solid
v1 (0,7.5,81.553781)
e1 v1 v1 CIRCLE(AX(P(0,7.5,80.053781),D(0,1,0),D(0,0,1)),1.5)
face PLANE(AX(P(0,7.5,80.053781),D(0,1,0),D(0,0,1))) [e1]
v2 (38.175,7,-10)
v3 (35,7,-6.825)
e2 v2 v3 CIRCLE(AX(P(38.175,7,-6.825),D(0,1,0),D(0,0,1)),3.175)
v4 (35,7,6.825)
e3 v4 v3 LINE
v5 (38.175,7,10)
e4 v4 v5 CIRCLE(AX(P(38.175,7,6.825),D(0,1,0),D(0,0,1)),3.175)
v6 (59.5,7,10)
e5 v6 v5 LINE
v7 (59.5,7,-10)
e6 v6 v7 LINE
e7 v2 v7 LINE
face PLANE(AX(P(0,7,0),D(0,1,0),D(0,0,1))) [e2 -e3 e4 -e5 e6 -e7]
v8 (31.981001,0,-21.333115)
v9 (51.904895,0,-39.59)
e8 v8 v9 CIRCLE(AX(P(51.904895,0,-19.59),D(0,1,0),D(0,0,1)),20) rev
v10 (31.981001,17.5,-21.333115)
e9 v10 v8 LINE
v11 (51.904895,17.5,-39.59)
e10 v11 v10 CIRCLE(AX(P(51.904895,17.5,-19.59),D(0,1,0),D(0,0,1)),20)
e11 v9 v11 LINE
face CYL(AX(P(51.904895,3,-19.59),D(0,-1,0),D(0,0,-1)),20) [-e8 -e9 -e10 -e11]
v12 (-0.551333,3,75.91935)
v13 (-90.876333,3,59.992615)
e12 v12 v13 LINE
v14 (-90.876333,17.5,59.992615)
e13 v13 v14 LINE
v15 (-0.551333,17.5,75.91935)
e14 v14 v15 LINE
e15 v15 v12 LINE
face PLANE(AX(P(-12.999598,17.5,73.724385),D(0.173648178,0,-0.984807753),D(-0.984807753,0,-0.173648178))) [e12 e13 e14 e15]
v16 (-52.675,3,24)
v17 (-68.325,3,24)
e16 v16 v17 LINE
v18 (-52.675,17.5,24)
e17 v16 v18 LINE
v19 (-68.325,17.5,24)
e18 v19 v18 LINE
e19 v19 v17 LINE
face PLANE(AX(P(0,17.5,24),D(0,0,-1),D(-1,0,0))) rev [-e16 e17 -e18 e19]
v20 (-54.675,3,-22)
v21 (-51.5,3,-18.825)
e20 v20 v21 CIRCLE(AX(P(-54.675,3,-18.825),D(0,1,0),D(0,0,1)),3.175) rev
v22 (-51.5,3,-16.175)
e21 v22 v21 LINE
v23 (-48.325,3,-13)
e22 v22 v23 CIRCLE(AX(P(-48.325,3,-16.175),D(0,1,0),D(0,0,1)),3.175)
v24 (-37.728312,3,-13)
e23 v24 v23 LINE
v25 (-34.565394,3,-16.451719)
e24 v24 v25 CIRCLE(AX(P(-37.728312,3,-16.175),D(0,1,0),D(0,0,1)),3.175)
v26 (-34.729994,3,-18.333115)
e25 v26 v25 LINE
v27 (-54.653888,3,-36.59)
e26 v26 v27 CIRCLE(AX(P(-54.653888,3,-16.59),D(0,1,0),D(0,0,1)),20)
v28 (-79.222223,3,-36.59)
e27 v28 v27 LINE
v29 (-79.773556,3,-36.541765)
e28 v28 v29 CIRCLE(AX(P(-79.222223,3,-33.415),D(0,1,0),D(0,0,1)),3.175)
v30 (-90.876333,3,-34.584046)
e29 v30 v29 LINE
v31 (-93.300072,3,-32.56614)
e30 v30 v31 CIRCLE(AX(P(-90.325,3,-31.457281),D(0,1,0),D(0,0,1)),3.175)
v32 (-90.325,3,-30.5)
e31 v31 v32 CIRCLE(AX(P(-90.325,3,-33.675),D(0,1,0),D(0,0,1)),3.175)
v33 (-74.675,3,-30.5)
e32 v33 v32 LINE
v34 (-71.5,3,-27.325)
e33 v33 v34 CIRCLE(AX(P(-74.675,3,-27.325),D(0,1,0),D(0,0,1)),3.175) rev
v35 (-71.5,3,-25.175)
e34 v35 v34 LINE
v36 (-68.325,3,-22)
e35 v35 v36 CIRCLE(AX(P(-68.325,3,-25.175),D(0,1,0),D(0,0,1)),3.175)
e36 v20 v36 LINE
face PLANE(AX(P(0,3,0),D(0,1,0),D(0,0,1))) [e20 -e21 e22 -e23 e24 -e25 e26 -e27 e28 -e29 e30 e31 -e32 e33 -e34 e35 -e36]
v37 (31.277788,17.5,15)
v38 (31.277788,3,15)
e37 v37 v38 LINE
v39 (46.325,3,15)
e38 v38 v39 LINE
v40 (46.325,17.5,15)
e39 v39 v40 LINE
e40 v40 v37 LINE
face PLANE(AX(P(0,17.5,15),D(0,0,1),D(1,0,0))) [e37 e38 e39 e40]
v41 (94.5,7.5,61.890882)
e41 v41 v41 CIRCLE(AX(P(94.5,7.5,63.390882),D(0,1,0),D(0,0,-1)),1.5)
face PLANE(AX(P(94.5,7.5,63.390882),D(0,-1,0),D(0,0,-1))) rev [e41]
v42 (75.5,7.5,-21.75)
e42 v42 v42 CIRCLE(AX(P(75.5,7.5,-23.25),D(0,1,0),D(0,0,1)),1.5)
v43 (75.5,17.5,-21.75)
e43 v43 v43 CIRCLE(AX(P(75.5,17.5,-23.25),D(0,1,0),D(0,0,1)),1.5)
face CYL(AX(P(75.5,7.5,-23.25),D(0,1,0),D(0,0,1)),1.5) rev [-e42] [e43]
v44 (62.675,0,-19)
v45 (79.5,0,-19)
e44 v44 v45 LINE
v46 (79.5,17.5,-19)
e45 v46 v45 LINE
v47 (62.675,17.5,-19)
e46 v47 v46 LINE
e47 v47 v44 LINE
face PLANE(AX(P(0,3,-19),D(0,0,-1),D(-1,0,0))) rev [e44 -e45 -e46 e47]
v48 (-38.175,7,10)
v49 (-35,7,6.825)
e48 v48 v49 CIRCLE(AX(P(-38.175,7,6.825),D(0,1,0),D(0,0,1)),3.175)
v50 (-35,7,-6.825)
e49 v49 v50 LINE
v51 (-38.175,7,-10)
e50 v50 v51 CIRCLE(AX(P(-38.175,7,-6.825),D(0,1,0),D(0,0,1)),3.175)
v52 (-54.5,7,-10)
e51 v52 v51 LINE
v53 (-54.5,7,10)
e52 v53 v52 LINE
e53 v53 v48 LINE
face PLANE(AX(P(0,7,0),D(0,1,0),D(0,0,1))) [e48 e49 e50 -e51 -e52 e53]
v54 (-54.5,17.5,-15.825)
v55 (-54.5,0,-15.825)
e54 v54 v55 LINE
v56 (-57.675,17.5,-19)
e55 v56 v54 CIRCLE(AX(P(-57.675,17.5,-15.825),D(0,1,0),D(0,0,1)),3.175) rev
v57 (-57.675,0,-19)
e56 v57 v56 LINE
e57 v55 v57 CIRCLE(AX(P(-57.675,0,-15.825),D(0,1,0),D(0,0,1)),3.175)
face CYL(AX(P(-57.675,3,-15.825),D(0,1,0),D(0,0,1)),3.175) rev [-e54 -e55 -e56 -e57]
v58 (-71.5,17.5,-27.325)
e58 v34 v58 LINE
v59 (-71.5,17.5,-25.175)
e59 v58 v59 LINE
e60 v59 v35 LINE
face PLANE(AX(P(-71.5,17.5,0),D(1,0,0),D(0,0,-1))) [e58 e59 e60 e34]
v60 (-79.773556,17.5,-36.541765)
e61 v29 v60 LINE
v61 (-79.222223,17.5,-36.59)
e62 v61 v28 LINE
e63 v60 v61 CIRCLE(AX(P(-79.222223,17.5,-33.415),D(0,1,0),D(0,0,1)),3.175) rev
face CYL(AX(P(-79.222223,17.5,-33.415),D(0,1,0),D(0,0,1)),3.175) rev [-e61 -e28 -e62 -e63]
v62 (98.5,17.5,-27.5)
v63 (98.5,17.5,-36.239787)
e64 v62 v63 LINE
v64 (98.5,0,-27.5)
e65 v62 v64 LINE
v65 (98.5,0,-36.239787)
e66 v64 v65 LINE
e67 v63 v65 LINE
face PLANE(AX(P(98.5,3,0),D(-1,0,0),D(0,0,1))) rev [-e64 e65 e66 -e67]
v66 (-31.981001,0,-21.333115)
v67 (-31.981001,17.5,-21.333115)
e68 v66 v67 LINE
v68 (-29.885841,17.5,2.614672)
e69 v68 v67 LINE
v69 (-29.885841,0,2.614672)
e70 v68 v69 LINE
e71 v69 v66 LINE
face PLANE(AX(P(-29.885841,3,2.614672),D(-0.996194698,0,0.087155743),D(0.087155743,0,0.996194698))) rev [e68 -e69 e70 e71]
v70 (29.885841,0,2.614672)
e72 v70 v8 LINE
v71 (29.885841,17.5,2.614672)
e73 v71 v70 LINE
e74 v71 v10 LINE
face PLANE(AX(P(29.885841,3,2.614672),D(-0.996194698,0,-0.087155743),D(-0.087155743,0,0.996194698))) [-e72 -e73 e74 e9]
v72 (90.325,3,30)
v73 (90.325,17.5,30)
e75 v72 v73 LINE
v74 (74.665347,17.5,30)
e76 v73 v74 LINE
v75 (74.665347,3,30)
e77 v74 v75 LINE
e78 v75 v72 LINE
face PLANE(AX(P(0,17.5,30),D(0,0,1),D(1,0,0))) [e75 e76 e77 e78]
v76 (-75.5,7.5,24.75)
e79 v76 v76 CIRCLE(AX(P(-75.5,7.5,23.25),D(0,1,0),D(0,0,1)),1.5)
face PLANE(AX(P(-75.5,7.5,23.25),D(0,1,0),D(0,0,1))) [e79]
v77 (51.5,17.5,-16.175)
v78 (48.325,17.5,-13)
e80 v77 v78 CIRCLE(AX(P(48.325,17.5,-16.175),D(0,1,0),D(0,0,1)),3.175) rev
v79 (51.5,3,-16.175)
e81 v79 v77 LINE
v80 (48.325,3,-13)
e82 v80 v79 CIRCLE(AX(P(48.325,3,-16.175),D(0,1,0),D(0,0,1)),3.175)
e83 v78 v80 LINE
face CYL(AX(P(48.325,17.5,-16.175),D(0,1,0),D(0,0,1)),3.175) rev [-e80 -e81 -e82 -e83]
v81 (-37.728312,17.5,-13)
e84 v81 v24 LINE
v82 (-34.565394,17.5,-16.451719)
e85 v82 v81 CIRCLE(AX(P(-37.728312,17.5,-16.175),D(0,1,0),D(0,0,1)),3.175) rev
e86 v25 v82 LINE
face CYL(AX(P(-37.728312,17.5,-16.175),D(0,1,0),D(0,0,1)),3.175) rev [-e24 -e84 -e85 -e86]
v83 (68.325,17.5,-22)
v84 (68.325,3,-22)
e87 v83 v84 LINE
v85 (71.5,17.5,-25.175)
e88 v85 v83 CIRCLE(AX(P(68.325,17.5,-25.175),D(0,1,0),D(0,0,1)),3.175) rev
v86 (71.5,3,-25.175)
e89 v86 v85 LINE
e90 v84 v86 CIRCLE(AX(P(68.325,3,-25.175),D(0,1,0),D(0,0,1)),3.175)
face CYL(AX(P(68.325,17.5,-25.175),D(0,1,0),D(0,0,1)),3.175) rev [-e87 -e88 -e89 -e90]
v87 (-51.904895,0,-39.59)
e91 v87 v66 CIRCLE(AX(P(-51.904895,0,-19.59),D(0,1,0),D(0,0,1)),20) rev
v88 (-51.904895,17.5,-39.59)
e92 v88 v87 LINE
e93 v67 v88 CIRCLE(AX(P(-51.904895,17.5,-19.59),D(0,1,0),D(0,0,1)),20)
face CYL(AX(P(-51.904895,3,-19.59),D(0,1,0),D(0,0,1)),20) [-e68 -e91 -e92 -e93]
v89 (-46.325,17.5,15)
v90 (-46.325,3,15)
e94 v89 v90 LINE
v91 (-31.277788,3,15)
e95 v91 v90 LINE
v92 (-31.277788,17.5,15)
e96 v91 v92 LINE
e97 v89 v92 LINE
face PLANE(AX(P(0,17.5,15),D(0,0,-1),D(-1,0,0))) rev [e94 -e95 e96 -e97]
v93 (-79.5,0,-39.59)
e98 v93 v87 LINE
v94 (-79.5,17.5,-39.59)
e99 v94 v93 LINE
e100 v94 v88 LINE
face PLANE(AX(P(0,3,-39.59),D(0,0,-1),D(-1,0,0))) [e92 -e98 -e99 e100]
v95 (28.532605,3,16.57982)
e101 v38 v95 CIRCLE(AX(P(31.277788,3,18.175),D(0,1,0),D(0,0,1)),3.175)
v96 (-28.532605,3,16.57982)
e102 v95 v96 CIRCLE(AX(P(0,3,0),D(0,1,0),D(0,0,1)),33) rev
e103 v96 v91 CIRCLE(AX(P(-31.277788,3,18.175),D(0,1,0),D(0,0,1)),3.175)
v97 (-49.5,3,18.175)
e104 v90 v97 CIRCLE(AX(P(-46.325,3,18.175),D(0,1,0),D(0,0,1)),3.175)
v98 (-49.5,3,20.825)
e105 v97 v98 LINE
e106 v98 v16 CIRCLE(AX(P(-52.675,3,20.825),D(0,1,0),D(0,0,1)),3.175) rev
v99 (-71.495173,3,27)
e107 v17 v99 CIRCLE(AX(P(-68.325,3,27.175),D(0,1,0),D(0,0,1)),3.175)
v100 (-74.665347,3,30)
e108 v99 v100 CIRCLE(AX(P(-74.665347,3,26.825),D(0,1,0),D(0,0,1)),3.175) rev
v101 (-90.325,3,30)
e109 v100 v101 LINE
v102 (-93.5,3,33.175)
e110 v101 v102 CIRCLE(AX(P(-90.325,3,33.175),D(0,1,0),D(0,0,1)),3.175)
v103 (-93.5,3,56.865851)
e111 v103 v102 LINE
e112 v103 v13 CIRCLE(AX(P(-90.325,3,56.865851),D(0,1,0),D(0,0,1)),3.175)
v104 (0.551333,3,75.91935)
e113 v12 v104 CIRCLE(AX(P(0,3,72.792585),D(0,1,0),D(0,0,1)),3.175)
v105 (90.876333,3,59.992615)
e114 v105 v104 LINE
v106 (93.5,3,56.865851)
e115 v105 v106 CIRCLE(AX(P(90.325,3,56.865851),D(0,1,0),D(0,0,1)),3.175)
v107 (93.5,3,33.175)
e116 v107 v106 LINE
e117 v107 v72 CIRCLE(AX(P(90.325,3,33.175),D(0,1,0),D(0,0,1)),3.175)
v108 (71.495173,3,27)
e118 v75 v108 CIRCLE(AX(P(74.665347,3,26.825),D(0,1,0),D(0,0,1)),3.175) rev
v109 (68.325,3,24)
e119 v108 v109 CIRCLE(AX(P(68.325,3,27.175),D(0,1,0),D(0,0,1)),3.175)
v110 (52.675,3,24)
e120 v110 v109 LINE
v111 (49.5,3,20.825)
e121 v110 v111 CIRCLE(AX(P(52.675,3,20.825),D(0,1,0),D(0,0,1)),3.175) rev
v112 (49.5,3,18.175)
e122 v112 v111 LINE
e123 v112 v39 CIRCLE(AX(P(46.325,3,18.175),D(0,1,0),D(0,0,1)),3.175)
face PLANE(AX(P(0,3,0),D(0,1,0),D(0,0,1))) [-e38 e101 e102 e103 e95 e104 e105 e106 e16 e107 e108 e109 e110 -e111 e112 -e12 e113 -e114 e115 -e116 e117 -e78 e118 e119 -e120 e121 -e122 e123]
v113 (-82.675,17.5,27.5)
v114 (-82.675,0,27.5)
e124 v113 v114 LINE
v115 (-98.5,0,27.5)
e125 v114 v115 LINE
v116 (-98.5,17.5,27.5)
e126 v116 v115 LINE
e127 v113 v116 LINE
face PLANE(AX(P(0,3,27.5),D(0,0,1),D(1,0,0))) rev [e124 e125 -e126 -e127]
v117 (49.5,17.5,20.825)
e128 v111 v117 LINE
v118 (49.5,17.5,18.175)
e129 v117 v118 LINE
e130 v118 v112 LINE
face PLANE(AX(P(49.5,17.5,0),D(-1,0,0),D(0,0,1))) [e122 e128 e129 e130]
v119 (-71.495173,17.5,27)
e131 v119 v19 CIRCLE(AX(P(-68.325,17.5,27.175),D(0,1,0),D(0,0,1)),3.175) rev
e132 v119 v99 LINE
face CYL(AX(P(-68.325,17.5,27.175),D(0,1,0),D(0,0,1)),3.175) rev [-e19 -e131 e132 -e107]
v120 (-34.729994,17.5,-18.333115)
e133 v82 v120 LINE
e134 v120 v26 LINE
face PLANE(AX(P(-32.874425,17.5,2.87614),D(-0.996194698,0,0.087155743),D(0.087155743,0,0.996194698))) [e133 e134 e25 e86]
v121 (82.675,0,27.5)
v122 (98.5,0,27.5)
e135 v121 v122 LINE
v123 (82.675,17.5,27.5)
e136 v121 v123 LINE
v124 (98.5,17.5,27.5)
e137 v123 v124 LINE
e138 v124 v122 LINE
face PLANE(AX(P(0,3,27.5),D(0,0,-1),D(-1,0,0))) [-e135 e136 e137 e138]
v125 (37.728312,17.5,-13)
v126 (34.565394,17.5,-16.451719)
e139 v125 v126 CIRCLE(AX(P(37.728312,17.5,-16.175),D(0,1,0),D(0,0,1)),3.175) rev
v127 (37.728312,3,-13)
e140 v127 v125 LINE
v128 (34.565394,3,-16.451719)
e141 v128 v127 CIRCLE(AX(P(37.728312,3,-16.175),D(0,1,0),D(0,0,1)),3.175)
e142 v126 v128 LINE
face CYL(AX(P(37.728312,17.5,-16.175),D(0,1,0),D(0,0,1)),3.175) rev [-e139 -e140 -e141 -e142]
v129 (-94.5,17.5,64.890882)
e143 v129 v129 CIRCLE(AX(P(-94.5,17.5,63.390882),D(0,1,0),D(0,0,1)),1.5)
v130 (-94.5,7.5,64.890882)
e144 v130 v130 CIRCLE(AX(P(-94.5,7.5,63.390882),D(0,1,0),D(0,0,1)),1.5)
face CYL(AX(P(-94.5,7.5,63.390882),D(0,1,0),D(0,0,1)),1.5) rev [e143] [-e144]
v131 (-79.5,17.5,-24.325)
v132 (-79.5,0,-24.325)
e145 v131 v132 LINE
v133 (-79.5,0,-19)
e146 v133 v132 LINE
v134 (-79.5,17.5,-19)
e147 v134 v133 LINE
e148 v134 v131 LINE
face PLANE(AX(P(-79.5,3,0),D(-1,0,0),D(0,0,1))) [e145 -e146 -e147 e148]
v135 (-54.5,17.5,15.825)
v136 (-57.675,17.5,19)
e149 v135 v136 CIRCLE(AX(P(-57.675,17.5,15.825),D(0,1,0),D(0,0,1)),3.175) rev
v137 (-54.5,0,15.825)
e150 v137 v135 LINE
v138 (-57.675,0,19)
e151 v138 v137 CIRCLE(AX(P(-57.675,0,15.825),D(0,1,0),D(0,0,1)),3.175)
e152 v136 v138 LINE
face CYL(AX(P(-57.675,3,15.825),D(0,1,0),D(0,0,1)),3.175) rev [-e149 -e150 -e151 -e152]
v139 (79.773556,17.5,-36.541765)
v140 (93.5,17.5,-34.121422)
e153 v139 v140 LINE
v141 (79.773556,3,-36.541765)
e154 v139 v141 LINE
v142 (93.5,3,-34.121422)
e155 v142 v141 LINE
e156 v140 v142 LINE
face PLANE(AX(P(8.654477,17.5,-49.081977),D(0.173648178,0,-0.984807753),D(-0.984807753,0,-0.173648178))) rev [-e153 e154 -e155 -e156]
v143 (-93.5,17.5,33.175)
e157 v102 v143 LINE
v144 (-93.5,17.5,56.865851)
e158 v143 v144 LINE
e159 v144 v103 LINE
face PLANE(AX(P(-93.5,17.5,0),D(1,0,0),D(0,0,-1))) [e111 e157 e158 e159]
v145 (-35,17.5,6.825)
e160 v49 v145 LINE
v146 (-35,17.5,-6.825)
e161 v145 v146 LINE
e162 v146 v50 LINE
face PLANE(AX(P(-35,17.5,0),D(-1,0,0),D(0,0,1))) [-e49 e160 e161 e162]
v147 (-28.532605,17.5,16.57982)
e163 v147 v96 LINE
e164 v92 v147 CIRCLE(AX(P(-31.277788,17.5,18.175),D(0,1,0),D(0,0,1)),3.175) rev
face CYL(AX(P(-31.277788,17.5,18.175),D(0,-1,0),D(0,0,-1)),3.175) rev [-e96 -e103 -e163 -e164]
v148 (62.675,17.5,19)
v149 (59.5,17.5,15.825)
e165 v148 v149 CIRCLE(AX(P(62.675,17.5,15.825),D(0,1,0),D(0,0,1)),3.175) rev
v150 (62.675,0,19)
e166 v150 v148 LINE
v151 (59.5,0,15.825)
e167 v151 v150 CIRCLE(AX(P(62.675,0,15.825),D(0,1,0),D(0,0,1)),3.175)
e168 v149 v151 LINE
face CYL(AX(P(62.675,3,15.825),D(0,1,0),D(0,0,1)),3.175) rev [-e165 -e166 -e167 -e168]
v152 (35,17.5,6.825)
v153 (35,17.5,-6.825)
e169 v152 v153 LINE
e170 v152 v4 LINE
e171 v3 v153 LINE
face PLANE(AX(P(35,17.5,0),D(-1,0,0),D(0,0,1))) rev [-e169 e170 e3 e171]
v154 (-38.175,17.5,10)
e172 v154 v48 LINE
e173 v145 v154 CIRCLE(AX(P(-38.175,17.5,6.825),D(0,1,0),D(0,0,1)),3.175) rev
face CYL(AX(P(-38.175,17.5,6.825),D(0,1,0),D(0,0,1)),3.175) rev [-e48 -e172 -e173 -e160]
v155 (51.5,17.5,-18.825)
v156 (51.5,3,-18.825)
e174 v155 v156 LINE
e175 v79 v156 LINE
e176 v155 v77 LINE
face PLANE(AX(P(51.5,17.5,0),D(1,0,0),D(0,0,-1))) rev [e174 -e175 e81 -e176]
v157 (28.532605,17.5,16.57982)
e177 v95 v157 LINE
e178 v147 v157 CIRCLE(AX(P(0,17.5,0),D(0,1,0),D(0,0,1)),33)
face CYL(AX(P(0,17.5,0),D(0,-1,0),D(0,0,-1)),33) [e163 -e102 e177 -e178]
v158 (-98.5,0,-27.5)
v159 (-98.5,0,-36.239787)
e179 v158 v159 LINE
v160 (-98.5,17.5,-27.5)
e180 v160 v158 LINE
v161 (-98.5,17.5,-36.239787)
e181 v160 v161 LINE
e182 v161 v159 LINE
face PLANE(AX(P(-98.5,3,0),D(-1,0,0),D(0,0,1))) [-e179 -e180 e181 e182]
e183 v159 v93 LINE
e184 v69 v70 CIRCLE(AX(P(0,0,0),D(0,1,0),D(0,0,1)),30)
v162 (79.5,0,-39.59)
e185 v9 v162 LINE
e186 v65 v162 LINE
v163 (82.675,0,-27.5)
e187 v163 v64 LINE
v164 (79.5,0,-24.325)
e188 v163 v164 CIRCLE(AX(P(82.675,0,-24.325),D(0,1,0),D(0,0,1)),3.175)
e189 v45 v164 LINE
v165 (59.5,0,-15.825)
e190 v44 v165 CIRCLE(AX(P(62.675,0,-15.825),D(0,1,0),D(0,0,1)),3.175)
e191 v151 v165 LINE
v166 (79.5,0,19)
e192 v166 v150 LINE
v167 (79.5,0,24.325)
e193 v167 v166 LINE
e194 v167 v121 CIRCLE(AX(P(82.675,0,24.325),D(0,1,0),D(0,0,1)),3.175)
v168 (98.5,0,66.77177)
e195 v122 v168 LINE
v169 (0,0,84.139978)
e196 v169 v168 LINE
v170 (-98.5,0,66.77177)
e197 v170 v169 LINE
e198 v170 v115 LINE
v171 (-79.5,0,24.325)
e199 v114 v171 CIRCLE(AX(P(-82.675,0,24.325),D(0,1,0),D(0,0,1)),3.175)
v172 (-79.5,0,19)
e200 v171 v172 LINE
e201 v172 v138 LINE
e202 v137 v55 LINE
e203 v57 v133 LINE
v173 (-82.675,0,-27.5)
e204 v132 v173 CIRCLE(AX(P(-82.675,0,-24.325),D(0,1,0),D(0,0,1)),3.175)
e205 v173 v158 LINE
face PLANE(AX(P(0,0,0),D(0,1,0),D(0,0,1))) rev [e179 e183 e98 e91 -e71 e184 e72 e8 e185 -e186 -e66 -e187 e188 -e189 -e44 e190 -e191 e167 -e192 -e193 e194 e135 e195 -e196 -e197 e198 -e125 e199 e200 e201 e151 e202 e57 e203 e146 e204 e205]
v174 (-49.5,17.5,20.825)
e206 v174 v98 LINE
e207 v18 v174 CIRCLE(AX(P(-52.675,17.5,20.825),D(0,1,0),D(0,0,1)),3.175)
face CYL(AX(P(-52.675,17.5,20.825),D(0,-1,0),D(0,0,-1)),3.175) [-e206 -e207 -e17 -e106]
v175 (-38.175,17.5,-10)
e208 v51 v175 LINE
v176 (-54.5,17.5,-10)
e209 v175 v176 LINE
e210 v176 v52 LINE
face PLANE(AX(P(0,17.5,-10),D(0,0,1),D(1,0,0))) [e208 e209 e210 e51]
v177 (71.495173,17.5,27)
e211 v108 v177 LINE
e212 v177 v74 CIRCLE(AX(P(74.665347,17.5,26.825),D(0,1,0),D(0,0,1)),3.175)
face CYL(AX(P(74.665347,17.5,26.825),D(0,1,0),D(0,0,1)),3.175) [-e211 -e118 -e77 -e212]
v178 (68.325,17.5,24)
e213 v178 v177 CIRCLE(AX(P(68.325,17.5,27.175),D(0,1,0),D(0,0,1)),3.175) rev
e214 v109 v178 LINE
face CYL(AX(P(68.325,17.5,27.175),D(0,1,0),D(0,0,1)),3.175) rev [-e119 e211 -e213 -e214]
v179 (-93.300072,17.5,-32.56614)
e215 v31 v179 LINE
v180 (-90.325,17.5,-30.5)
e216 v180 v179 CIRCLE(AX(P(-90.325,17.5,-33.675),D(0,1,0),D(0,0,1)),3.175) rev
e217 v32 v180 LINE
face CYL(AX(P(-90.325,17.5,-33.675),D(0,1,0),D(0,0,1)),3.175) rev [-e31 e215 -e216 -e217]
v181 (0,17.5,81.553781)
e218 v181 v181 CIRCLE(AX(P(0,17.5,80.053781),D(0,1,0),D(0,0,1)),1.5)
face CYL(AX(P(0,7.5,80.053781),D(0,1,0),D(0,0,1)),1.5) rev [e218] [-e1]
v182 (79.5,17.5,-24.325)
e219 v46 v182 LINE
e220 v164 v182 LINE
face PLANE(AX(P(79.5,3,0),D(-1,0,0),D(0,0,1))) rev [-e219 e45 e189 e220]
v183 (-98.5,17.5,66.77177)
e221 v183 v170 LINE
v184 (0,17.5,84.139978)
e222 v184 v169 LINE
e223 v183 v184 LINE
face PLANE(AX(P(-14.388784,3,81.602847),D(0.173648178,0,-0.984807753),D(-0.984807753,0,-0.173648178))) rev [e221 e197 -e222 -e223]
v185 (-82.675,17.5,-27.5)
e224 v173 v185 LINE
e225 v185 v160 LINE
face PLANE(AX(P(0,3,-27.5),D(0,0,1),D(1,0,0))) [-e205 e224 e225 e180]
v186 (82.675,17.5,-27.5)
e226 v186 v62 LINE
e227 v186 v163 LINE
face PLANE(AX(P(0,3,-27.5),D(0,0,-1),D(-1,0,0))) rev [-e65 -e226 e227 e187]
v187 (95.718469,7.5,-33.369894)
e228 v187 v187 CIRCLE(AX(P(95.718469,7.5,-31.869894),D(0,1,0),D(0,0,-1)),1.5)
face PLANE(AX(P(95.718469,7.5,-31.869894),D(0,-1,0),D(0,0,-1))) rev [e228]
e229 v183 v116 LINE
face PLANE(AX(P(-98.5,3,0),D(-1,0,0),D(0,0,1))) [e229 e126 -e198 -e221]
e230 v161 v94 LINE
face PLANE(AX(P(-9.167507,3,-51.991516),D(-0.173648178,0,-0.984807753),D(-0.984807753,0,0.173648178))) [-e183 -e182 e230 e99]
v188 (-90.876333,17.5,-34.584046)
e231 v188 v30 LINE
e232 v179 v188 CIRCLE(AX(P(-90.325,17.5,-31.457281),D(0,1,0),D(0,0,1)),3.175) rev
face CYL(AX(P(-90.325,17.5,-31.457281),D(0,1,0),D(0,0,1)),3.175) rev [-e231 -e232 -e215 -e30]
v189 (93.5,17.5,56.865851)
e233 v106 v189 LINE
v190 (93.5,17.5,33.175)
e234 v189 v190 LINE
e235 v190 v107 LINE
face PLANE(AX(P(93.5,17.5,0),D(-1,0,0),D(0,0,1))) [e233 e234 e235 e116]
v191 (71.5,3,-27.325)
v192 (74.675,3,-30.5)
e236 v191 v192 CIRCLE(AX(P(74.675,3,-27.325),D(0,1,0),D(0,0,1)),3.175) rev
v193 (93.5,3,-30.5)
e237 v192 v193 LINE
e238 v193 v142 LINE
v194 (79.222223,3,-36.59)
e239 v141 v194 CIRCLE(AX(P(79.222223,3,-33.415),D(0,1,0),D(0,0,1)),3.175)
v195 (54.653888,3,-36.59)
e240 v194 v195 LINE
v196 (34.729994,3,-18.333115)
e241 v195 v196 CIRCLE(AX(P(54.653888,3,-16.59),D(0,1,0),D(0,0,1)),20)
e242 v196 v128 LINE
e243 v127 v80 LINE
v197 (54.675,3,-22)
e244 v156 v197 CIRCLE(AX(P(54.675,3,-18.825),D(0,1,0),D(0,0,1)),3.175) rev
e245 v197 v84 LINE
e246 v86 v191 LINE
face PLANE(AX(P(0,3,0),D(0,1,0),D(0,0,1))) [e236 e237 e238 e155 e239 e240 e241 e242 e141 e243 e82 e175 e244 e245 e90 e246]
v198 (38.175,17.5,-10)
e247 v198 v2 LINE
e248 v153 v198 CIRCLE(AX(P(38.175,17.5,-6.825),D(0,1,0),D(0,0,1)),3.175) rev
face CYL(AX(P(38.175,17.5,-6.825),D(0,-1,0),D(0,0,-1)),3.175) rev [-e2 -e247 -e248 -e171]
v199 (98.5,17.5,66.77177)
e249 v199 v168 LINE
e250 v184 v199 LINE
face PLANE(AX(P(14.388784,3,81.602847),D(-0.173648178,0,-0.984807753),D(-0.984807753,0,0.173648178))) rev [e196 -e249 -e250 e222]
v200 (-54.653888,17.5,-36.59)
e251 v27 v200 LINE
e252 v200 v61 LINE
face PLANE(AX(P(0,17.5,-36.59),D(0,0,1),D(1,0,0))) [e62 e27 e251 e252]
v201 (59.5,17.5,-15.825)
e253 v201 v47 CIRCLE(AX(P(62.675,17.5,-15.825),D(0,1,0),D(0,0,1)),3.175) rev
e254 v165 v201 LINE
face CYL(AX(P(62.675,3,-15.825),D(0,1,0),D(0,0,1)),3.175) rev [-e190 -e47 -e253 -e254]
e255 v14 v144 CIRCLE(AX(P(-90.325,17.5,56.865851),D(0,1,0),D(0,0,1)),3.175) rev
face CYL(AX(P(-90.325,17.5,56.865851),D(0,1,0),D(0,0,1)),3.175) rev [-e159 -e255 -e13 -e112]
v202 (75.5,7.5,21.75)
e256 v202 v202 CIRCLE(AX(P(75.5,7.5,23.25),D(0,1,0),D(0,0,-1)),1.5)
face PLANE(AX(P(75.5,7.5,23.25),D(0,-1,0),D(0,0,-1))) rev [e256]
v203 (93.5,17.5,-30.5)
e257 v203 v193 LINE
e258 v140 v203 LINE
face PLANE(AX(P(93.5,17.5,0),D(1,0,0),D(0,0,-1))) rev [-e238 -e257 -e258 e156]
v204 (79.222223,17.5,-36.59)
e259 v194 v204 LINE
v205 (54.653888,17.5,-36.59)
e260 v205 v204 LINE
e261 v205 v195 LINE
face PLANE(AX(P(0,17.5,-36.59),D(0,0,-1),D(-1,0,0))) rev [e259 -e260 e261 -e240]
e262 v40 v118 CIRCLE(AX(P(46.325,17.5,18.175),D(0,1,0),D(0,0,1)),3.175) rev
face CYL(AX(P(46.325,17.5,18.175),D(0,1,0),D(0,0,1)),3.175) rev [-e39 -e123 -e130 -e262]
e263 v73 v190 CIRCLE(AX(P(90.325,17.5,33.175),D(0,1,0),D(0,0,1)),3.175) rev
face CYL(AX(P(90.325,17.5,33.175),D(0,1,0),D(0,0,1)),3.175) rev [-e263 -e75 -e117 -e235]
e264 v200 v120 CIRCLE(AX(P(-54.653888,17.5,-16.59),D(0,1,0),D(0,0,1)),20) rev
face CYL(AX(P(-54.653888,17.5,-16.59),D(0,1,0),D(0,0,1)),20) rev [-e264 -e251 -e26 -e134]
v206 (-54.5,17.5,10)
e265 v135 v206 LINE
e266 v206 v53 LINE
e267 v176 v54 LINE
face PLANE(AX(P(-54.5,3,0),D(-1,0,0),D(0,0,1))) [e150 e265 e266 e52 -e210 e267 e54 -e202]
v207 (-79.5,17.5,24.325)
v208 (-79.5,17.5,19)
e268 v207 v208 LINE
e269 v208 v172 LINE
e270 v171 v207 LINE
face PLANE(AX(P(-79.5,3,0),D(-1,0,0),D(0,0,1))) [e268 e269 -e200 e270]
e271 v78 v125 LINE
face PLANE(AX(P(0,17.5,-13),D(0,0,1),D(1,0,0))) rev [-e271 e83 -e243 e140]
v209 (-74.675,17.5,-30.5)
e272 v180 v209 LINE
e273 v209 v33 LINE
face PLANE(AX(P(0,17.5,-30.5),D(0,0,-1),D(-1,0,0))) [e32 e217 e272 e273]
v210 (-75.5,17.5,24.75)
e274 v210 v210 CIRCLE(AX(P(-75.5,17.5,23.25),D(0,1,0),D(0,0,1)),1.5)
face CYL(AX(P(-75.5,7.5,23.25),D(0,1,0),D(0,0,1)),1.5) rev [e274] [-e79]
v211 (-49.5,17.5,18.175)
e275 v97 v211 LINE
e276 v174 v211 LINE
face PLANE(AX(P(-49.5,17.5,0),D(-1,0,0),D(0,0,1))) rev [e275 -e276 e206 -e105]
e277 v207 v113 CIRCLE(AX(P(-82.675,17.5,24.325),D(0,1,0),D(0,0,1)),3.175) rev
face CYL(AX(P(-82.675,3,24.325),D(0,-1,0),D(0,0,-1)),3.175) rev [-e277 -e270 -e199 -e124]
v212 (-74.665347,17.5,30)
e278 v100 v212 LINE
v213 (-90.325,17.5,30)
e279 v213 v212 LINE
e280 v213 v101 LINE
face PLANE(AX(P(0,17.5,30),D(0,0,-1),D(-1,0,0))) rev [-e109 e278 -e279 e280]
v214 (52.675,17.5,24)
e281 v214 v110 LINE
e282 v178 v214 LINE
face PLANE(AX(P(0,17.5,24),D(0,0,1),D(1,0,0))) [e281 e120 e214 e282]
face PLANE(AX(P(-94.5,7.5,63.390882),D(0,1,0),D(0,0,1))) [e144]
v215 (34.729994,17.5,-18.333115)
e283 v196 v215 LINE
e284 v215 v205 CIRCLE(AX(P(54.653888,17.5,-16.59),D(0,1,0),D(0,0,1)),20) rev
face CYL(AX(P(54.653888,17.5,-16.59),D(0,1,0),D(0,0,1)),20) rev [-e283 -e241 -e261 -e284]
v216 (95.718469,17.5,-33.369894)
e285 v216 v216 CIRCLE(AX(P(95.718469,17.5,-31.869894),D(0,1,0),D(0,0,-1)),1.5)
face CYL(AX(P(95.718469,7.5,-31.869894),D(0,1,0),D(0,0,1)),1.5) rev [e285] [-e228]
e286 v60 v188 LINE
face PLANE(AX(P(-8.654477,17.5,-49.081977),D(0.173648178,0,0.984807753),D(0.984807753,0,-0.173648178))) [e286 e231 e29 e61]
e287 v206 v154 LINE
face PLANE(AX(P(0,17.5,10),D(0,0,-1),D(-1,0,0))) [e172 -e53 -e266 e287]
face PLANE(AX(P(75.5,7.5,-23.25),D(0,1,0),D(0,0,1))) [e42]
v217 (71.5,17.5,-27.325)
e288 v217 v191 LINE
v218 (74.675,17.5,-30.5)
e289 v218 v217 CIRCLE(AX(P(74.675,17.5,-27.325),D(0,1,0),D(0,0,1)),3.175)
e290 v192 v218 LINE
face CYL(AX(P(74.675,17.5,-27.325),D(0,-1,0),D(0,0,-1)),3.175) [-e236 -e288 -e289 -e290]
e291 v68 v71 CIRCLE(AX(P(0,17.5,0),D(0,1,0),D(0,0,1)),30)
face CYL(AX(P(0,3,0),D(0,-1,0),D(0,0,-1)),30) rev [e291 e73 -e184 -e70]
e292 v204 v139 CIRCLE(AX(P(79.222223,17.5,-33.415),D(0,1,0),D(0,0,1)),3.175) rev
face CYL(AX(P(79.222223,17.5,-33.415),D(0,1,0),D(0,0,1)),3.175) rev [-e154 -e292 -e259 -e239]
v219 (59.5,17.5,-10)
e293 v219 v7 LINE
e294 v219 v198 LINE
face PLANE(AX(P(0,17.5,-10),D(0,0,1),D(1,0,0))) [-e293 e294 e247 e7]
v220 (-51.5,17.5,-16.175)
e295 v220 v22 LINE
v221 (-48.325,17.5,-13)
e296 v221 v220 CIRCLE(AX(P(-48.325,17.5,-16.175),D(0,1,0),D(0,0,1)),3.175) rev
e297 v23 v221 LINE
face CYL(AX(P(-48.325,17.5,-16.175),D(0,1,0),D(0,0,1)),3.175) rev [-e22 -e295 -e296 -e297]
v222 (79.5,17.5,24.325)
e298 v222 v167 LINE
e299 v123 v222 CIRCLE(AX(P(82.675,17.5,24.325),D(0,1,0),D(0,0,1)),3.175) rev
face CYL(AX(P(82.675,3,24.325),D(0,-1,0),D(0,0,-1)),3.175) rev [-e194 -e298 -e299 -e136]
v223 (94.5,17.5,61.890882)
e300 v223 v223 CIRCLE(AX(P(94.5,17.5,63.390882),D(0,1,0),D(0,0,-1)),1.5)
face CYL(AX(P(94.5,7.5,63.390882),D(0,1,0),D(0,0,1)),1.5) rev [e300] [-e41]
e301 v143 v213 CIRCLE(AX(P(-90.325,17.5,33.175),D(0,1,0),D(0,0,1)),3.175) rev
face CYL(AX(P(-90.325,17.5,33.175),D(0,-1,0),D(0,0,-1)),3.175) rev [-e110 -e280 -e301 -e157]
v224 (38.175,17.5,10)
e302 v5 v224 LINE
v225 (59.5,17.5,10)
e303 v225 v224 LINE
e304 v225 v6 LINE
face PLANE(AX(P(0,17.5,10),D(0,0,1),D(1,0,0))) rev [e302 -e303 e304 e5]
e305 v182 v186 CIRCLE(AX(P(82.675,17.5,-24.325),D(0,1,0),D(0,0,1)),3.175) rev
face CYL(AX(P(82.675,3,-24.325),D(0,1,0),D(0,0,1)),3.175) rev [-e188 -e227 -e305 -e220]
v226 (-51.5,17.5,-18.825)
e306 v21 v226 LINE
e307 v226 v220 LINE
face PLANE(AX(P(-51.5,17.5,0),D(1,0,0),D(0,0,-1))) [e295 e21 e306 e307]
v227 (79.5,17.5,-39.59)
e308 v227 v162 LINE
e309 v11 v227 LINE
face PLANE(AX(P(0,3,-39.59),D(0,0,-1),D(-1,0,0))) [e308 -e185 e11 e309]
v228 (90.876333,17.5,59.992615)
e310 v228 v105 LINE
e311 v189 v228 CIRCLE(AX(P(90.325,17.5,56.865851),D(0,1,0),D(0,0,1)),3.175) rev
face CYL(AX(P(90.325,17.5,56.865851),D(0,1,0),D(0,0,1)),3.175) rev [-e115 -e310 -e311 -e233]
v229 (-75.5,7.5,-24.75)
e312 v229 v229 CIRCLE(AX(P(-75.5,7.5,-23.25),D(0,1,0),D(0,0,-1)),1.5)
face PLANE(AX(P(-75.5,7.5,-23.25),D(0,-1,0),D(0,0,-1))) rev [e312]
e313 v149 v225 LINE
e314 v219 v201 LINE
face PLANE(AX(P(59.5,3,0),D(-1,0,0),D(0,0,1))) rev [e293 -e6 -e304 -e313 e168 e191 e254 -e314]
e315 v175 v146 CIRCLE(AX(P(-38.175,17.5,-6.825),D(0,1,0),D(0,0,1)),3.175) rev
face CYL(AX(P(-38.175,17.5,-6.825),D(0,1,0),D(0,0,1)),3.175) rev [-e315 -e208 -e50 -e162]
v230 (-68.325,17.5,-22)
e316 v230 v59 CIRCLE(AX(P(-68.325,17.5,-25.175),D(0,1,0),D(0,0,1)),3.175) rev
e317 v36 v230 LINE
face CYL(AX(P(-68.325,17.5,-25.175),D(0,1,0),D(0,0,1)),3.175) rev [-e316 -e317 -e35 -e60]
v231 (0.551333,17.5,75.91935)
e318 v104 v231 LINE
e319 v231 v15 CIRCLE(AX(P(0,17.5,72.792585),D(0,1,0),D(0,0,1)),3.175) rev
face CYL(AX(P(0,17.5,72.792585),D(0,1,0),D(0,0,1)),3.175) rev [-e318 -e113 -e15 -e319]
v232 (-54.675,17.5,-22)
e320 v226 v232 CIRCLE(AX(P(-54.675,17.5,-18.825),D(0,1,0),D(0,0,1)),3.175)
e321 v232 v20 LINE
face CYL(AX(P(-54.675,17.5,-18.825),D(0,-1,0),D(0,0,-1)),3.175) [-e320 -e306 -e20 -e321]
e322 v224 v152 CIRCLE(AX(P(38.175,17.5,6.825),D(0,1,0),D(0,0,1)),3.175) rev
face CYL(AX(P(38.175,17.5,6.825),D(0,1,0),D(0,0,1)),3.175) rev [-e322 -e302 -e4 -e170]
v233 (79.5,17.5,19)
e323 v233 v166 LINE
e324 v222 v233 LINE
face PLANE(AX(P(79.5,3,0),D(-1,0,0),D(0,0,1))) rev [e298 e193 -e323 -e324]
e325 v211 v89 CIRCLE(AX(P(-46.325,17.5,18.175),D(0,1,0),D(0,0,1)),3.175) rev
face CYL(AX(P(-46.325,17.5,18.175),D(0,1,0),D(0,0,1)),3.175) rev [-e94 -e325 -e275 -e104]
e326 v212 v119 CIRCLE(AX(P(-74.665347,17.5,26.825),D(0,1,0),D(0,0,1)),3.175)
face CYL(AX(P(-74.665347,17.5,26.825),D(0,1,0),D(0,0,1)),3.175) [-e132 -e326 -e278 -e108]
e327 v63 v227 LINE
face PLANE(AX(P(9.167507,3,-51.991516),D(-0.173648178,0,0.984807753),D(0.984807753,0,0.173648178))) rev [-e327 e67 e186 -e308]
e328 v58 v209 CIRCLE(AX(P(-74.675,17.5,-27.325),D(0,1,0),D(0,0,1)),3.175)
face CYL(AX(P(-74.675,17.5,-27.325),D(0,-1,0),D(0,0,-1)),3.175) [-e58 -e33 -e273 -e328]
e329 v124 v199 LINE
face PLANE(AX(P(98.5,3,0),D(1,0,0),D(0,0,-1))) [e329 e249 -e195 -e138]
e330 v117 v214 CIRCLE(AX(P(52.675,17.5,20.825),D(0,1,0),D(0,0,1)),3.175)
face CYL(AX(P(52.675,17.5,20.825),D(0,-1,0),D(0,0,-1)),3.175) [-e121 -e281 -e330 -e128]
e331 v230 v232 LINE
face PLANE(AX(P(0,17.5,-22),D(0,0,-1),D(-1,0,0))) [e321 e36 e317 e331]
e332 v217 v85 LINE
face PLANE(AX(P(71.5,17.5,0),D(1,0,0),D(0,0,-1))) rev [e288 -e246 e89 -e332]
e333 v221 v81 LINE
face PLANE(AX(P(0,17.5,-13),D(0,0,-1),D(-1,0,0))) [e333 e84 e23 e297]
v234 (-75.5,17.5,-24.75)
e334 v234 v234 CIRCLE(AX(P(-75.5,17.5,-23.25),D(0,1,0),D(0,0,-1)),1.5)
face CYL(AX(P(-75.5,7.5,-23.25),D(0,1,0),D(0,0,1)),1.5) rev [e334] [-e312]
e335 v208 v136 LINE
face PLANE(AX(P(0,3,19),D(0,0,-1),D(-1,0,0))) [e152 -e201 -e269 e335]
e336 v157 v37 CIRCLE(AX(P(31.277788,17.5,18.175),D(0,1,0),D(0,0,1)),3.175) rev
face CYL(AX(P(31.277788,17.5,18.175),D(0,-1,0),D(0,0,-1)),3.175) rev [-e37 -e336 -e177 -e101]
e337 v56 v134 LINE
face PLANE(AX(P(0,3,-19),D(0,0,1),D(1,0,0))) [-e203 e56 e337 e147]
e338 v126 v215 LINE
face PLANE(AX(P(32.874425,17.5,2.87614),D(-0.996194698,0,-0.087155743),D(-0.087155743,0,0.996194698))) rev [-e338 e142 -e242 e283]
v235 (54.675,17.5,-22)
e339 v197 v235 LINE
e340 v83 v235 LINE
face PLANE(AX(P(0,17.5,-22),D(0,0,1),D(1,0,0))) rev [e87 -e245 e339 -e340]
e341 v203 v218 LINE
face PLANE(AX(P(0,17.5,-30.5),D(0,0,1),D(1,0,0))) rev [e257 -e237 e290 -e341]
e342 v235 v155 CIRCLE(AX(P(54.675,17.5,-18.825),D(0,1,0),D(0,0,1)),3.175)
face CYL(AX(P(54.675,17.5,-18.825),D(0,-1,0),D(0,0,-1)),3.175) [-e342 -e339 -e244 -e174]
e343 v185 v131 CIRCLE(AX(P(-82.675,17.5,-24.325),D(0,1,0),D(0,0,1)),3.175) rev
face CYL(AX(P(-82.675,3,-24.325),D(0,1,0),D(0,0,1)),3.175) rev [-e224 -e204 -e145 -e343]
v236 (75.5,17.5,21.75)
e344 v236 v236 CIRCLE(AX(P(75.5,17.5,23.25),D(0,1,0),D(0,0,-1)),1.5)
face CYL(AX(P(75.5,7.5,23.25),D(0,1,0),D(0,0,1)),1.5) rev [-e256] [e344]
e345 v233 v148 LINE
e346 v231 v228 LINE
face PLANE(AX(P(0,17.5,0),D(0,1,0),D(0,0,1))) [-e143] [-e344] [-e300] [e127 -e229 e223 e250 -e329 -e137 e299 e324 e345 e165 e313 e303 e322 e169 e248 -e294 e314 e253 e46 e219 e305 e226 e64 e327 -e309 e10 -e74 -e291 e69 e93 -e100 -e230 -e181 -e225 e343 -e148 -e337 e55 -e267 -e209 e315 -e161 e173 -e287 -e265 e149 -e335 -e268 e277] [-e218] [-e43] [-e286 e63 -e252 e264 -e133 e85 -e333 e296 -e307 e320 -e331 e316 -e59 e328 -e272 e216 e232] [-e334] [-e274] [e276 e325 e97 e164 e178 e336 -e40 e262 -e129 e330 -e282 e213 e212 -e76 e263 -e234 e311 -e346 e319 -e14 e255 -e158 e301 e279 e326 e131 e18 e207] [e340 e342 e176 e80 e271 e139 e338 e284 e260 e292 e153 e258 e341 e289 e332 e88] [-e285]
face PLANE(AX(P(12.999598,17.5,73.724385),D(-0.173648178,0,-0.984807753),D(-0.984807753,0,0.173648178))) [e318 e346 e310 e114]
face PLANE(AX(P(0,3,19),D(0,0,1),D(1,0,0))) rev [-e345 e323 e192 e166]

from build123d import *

# Parameters (mm, degrees)
SALIENTE_EXTRUIR1_DEPTH = 3
SALIENTE_EXTRUIR2_DEPTH = 17.5
REDONDEO1_R             = 3.175
REDONDEO3_R             = 3.175
REDONDEO5_R             = 3.175
CROQUIS5_R              = 1.5
CORTAR_EXTRUIR1_DEPTH   = 10
SALIENTE_EXTRUIR3_DEPTH = 7
REDONDEO6_R             = 3.175
REDONDEO7_R             = 3.175
REDONDEO8_R             = 3.175
REDONDEO12_R            = 20
REDONDEO11_R            = 20


with BuildPart() as part:
    # Croquis2 → Saliente-Extruir1 (new body)
    with BuildSketch(Plane(origin=(0, 0, 0), x_dir=(1, 0, 0), z_dir=(0, 1, 0))):
        with BuildLine():
            Line((-98.5, -27.5), (-98.5, -66.771770067))
            Line((-98.5, -66.771770067), (0, -84.139977667))
            Line((0, -84.139977667), (98.5, -66.771770067))
            Line((98.5, -66.771770067), (98.5, -27.5))
            Line((98.5, -27.5), (79.5, -27.5))
            Line((79.5, -27.5), (79.5, -19))
            Line((79.5, -19), (59.5, -19))
            Line((59.5, -19), (59.5, 19))
            Line((59.5, 19), (79.5, 19))
            Line((79.5, 19), (79.5, 27.5))
            Line((79.5, 27.5), (98.5, 27.5))
            Line((98.5, 27.5), (98.5, 36.239787367))
            Line((98.5, 36.239787367), (79.5, 39.59))
            Line((79.5, 39.59), (33.578271315, 39.59))
            Line((33.578271315, 39.59), (29.885840943, -2.614672282))
            ThreePointArc((29.885840943, -2.614672282), (0, -30), (-29.885840943, -2.614672282))
            Line((-29.885840943, -2.614672282), (-33.578271315, 39.59))
            Line((-33.578271315, 39.59), (-79.5, 39.59))
            Line((-79.5, 39.59), (-98.5, 36.239787367))
            Line((-98.5, 36.239787367), (-98.5, 27.5))
            Line((-98.5, 27.5), (-79.5, 27.5))
            Line((-79.5, 27.5), (-79.5, 19))
            Line((-79.5, 19), (-54.5, 19))
            Line((-54.5, 19), (-54.5, -19))
            Line((-54.5, -19), (-79.5, -19))
            Line((-79.5, -19), (-79.5, -27.5))
            Line((-79.5, -27.5), (-98.5, -27.5))
        make_face()
    extrude(amount=SALIENTE_EXTRUIR1_DEPTH)

    # Croquis2<3> → Saliente-Extruir2 (add)
    with BuildSketch(Plane(origin=(0, 0, 0), x_dir=(1, 0, 0), z_dir=(0, 1, 0))):
        with BuildLine():
            Line((-98.5, -27.5), (-98.5, -66.771770067))
            Line((-98.5, -66.771770067), (0, -84.139977667))
            Line((0, -84.139977667), (98.5, -66.771770067))
            Line((98.5, -66.771770067), (98.5, -27.5))
            Line((98.5, -27.5), (79.5, -27.5))
            Line((79.5, -27.5), (79.5, -19))
            Line((79.5, -19), (59.5, -19))
            Line((59.5, -19), (59.5, -10))
            Line((59.5, -10), (35, -10))
            Line((35, -10), (35, 10))
            Line((35, 10), (59.5, 10))
            Line((59.5, 10), (59.5, 19))
            Line((59.5, 19), (79.5, 19))
            Line((79.5, 19), (79.5, 27.5))
            Line((79.5, 27.5), (98.5, 27.5))
            Line((98.5, 27.5), (98.5, 36.239787367))
            Line((98.5, 36.239787367), (79.5, 39.59))
            Line((79.5, 39.59), (33.578271315, 39.59))
            Line((33.578271315, 39.59), (29.885840943, -2.614672282))
            ThreePointArc((29.885840943, -2.614672282), (0, -30), (-29.885840943, -2.614672282))
            Line((-29.885840943, -2.614672282), (-33.578271315, 39.59))
            Line((-33.578271315, 39.59), (-79.5, 39.59))
            Line((-79.5, 39.59), (-98.5, 36.239787367))
            Line((-98.5, 36.239787367), (-98.5, 27.5))
            Line((-98.5, 27.5), (-79.5, 27.5))
            Line((-79.5, 27.5), (-79.5, 19))
            Line((-79.5, 19), (-54.5, 19))
            Line((-54.5, 19), (-54.5, 10))
            Line((-54.5, 10), (-35, 10))
            Line((-35, 10), (-35, -10))
            Line((-35, -10), (-54.5, -10))
            Line((-54.5, -10), (-54.5, -19))
            Line((-54.5, -19), (-79.5, -19))
            Line((-79.5, -19), (-79.5, -27.5))
            Line((-79.5, -27.5), (-98.5, -27.5))
        make_face()
        Polygon((-36.327264837, 36.59), (-34.263407265, 13), (-51.5, 13), (-51.5, 22), (-71.5, 22), (-71.5, 30.5), (-93.5, 30.5), (-93.5, 34.12142227), (-79.5, 36.59), align=None, mode=Mode.SUBTRACT)
        with BuildLine():
            Line((0, -76.016564772), (-93.5, -59.529992076))
            Line((-93.5, -59.529992076), (-93.5, -30))
            Line((-93.5, -30), (-71.5, -30))
            Line((-71.5, -30), (-71.5, -24))
            Line((-71.5, -24), (-49.5, -24))
            Line((-49.5, -24), (-49.5, -15))
            Line((-49.5, -15), (-29.393876913, -15))
            ThreePointArc((-29.393876913, -15), (0, -33), (29.393876913, -15))
            Line((29.393876913, -15), (49.5, -15))
            Line((49.5, -15), (49.5, -24))
            Line((49.5, -24), (71.5, -24))
            Line((71.5, -24), (71.5, -30))
            Line((71.5, -30), (93.5, -30))
            Line((93.5, -30), (93.5, -59.529992076))
            Line((93.5, -59.529992076), (0, -76.016564772))
        make_face(mode=Mode.SUBTRACT)
        Polygon((71.5, 30.5), (71.5, 22), (51.5, 22), (51.5, 13), (34.263407265, 13), (36.327264837, 36.59), (79.5, 36.59), (93.5, 34.12142227), (93.5, 30.5), align=None, mode=Mode.SUBTRACT)
    extrude(amount=SALIENTE_EXTRUIR2_DEPTH)

    # Redondeo1
    # the kernel refuses this fillet: 3.175 mm, written as the material it adds along each edge
    with BuildSketch(Plane(origin=(-79.5, 2.305558733, -36.59), x_dir=(1, 0, 0), z_dir=(0, 1, 0))) as redondeo1_piece_1:
        with BuildLine():
            CenterArc((REDONDEO1_R * 0.0874886635259, -REDONDEO1_R), REDONDEO1_R, 90, 10)
            Line((-REDONDEO1_R * 0.086159514141, -REDONDEO1_R * 0.0151922469878), (0, 0))
            Line((0, 0), (REDONDEO1_R * 0.0874886635259, 0))
        make_face()
    extrude(amount=15.194441267)
    with BuildSketch(Plane(origin=(-51.5, 3, -13), x_dir=(0, 0, -1), z_dir=(0, 1, 0)), Plane(origin=(-71.5, 3, -22), x_dir=(0, 0, -1), z_dir=(0, 1, 0)), Plane(origin=(-93.5, 3, -30.5), x_dir=(0, 0, -1), z_dir=(0, 1, 0))) as redondeo1_piece_2:
        with BuildLine():
            CenterArc((REDONDEO1_R, -REDONDEO1_R), REDONDEO1_R, 90, 90)
            Line((0, -REDONDEO1_R), (0, 0))
            Line((0, 0), (REDONDEO1_R, 0))
        make_face()
    extrude(amount=14.5)
    with BuildSketch(Plane(origin=(-93.5, 3, -34.12142227), x_dir=(0.9848077530122092, 0, -0.17364817766692342), z_dir=(0, 1, 0))) as redondeo1_piece_3:
        with BuildLine():
            CenterArc((REDONDEO1_R * 0.839099631177, -REDONDEO1_R), REDONDEO1_R, 90, 80)
            Line((-REDONDEO1_R * 0.145708121835, -REDONDEO1_R * 0.826351822333), (0, 0))
            Line((0, 0), (REDONDEO1_R * 0.839099631177, 0))
        make_face()
    extrude(amount=14.5)

    # Redondeo3
    redondeo3_edges = [part.edges().sort_by_distance(p)[0] for p in [
        (-49.5, 10.25, 15),
        (-29.393876913, 10.25, 15),
        (29.393876913, 10.25, 15),
        (49.5, 10.25, 15),
        (71.5, 10.25, 24),
        (93.5, 10.25, 30),
        (93.5, 10.25, 59.529992076),
        (0, 10.25, 76.016564772),
        (-93.5, 10.25, 59.529992076),
        (-93.5, 10.25, 30),
        (-71.5, 10.25, 24),
    ]]
    fillet(redondeo3_edges, radius=REDONDEO3_R)

    # Redondeo5
    redondeo5_edges = [part.edges().sort_by_distance(p)[0] for p in [
        (-49.5, 10.25, 24),
        (-71.5, 10.25, 30),
        (71.5, 10.25, 30),
        (49.5, 10.25, 24),
        (71.5, 10.25, -30.5),
        (51.5, 10.25, -22),
        (-51.5, 10.25, -22),
        (-71.5, 10.25, -30.5),
    ]]
    fillet(redondeo5_edges, radius=REDONDEO5_R)

    # Croquis5 → Cortar-Extruir1 (cut)
    with BuildSketch(Plane(origin=(0, 17.5, 0), x_dir=(1, 0, 0), z_dir=(0, 1, 0))):
        with Locations(Location((0, -80.053781473, 0), (0, 0, 270))):
            Circle(CROQUIS5_R)
        with Locations(Location((-94.5, -63.390881796, 0), (0, 0, 270))):
            Circle(CROQUIS5_R)
        with Locations(Location((-75.5, -23.25, 0), (0, 0, 270))):
            Circle(CROQUIS5_R)
        with Locations(Location((-75.5, 23.25, 0), (0, 0, 90))):
            Circle(CROQUIS5_R)
        with Locations(Location((75.5, 23.25, 0), (0, 0, 270))):
            Circle(CROQUIS5_R)
        with Locations(Location((95.718468624, 31.869893683, 0), (0, 0, 90))):
            Circle(CROQUIS5_R)
        with Locations(Location((75.5, -23.25, 0), (0, 0, 90))):
            Circle(CROQUIS5_R)
        with Locations(Location((94.5, -63.390881796, 0), (0, 0, 90))):
            Circle(CROQUIS5_R)
    extrude(amount=-CORTAR_EXTRUIR1_DEPTH, mode=Mode.SUBTRACT)

    # Croquis2<4> → Saliente-Extruir3 (add)
    with BuildSketch(Plane(origin=(0, 0, 0), x_dir=(1, 0, 0), z_dir=(0, 1, 0))):
        Polygon((-54.5, 10), (-54.5, -10), (-37.5, -10), (-35, -10), (-35, 10), (-37.5, 10), align=None)
        Polygon((37.5, -10), (59.5, -10), (59.5, 10), (37.5, 10), (35, 10), (35, -10), align=None)
    extrude(amount=SALIENTE_EXTRUIR3_DEPTH)

    # Redondeo6
    redondeo6_edges = [part.edges().sort_by_distance(p)[0] for p in [
        (-35, 12.25, -10),
        (-35, 12.25, 10),
        (35, 12.25, 10),
        (35, 12.25, -10),
        (79.5, 8.75, -27.5),
        (59.5, 8.75, -19),
        (59.5, 8.75, 19),
        (79.5, 8.75, 27.5),
        (-79.5, 8.75, 27.5),
        (-54.5, 8.75, 19),
        (-54.5, 8.75, -19),
        (-79.5, 8.75, -27.5),
    ]]
    fillet(redondeo6_edges, radius=REDONDEO6_R)

    # Redondeo7
    redondeo7_edges = [part.edges().sort_by_distance(p)[0] for p in [
        (-34.263407265, 10.25, -13),
    ]]
    fillet(redondeo7_edges, radius=REDONDEO7_R)

    # Redondeo8
    redondeo8_edges = [part.edges().sort_by_distance(p)[0] for p in [
        (34.263407265, 10.25, -13),
        (79.5, 10.25, -36.59),
        (71.5, 10.25, -22),
        (51.5, 10.25, -13),
    ]]
    fillet(redondeo8_edges, radius=REDONDEO8_R)

    # Redondeo12
    redondeo12_edges = [part.edges().sort_by_distance(p)[0] for p in [
        (36.327264837, 10.25, -36.59),
        (-36.327264837, 10.25, -36.59),
    ]]
    fillet(redondeo12_edges, radius=REDONDEO12_R)

    # Redondeo11
    redondeo11_edges = [part.edges().sort_by_distance(p)[0] for p in [
        (-33.578271315, 8.75, -39.59),
        (33.578271315, 8.75, -39.59),
    ]]
    fillet(redondeo11_edges, radius=REDONDEO11_R)


solid = part.part
